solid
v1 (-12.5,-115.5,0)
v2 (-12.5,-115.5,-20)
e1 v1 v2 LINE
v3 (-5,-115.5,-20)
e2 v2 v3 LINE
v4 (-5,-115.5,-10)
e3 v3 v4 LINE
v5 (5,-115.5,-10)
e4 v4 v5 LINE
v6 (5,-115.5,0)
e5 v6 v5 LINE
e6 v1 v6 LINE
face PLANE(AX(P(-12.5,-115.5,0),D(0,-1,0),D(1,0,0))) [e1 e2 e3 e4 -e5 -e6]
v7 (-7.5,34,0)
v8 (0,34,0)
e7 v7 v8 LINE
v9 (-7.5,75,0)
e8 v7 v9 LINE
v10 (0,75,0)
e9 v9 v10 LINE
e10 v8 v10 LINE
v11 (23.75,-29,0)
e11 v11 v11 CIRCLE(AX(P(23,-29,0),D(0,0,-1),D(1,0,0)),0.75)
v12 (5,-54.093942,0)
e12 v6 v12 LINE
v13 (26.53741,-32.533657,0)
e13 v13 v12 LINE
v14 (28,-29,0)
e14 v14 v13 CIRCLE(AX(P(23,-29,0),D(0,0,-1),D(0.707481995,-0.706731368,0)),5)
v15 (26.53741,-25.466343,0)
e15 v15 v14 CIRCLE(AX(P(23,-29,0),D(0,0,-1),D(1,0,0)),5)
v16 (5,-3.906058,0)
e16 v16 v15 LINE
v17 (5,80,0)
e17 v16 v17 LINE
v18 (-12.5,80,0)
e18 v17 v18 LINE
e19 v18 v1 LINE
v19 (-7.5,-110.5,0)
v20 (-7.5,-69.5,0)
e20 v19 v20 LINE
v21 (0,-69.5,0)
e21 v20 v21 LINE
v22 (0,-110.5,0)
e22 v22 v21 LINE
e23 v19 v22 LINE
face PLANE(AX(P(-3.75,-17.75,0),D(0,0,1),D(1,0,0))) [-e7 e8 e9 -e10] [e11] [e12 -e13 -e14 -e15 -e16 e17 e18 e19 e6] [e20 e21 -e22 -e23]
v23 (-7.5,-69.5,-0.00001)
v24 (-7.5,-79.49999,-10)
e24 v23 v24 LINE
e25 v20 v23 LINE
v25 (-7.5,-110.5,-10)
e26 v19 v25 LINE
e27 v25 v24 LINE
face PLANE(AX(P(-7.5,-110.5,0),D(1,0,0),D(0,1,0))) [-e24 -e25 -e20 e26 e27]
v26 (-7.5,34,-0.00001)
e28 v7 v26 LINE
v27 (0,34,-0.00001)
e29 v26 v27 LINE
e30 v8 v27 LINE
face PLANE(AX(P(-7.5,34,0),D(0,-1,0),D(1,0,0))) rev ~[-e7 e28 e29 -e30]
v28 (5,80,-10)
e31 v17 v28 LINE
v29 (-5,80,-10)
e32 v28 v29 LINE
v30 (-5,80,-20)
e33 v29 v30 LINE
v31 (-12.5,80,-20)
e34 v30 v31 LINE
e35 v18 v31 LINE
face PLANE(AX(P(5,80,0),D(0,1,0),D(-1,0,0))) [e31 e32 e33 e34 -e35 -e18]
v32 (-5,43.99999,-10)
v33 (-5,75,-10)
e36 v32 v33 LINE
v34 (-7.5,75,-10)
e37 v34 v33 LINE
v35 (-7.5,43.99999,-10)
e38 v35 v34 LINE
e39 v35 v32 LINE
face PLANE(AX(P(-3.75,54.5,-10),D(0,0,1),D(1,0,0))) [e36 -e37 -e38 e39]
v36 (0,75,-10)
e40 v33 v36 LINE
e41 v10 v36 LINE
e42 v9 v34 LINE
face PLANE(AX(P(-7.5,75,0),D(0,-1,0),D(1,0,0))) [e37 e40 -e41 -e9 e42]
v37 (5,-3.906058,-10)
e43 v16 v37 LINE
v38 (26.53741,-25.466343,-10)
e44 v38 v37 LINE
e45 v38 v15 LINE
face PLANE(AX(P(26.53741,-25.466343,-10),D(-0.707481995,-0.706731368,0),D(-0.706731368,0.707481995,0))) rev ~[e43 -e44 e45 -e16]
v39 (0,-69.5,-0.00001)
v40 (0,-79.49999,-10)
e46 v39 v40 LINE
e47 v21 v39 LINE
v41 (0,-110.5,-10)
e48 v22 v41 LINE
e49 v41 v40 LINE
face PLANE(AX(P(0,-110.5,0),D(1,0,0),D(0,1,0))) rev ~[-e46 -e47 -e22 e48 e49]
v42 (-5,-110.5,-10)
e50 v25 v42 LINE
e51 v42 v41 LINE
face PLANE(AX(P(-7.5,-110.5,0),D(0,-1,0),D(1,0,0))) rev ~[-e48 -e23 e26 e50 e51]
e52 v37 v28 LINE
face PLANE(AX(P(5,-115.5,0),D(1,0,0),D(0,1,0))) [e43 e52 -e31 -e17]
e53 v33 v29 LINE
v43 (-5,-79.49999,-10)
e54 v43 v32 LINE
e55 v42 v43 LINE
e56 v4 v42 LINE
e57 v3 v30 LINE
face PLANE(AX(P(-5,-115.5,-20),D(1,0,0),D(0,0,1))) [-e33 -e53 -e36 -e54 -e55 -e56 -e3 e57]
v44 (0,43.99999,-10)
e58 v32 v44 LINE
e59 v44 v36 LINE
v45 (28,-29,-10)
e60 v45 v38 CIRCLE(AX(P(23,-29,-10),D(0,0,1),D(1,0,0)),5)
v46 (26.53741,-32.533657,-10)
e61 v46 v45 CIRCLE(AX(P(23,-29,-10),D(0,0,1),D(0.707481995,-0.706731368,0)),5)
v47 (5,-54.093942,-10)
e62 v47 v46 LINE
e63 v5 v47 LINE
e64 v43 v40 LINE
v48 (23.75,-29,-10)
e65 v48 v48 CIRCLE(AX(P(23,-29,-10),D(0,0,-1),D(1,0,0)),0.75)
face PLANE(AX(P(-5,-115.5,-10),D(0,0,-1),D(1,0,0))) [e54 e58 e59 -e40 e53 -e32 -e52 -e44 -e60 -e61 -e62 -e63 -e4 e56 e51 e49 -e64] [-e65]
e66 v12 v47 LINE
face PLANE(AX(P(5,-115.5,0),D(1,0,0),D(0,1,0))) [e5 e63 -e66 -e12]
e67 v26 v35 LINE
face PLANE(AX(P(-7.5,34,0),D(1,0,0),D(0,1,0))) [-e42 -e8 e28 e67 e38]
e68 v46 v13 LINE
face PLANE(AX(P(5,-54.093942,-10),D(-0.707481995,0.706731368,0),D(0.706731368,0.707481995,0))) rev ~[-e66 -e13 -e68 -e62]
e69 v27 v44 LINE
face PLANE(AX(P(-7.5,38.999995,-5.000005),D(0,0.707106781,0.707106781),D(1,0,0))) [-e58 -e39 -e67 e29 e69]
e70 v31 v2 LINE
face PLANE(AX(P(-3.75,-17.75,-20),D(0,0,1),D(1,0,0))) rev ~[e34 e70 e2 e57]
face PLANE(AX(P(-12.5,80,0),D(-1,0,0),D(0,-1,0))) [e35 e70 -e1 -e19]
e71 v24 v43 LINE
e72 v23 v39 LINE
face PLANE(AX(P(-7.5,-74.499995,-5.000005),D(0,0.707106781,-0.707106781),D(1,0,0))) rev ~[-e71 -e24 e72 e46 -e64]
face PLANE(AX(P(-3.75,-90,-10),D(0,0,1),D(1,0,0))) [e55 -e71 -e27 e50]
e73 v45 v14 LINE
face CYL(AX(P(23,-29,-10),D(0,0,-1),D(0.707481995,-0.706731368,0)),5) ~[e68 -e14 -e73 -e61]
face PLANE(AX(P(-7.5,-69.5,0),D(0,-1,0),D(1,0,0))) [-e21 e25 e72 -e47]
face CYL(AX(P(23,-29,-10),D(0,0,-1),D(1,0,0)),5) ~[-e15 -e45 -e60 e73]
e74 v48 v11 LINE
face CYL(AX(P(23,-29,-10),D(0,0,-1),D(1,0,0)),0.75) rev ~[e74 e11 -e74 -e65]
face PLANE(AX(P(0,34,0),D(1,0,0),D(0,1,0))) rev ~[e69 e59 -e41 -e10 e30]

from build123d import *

# Parameters (mm, degrees)
F0_W     = 7.5
F0_H     = 41
F1_DEPTH = 20
F2_DEPTH = 10
F3_SIZE  = 9.99999
F4_W     = 10
F4_H     = 10
F5_DEPTH = 195.501
F7_DEPTH = 10
F8_R     = 0.75
F9_DEPTH = 25


# Not quite as in the source:
# - a fillet or chamfer is up to 0.001 mm smaller than in the source, because OpenCascade refuses the exact size


with BuildPart() as f1:
    # F0 (on Top) → F1 (new body)
    with BuildSketch(Plane.XY):
        Polygon((-12.5, 80), (-12.5, 75), (-12.5, -115.5), (5, -115.5), (5, -110.5), (5, 80), align=None)
        Polygon((0, 34), (0, 0), (0, -7.5), (0, -69.5), (0, -110.5), (-7.5, -110.5), (-7.5, -69.5), (-7.5, 34), (-7.5, 75), (0, 75), align=None, mode=Mode.SUBTRACT)
        with Locations((-3.75, -90)):
            Rectangle(F0_W, F0_H)
        Polygon((0, -7.5), (0, 0), (0, 34), (-7.5, 34), (-7.5, -69.5), (0, -69.5), align=None)
        with Locations((-3.75, 54.5)):
            Rectangle(F0_W, F0_H)
    extrude(amount=-F1_DEPTH)

    # F0 (on Top) → F2 (cut)
    with BuildSketch(Plane.XY):
        with Locations((-3.75, 54.5)):
            Rectangle(F0_W, F0_H)
        with Locations((-3.75, -90)):
            Rectangle(F0_W, F0_H)
    extrude(amount=-F2_DEPTH, mode=Mode.SUBTRACT)

    # F3 (size 10 in the source; OpenCascade refuses exactly that, so slightly less here)
    f3_edges = [f1.edges().sort_by_distance(p)[0] for p in [
        (-3.75, -69.5, -10),
        (-3.75, 34, -10),
    ]]
    chamfer(f3_edges, length=F3_SIZE)

    # F4 (on face) → F5 (cut, through all)
    with BuildSketch(Plane.XZ.offset(115.5)):
        with Locations((0, -15)):
            Rectangle(F4_W, F4_H)
    extrude(amount=-F5_DEPTH, mode=Mode.SUBTRACT)

    # F6 (on face) → F7 (join)
    with BuildSketch(Plane.XY):
        with BuildLine():
            Line((29, -22.6551367564), (5, -3.9060580615))
            Line((5, -3.9060580615), (5, -54.0939419385))
            Line((5, -54.0939419385), (32.0781262822, -32.9401952478))
            ThreePointArc((32.0781262822, -32.9401952478), (26.8080409916, -33.4939198597), (24, -29))
            ThreePointArc((24, -29), (25.4644660941, -25.4644660941), (29, -24))
            Line((29, -24), (29, -22.6551367564))
        make_face()
        with BuildLine():
            Line((32.0781262822, -25.0598047522), (29, -22.6551367564))
            Line((29, -22.6551367564), (29, -24))
            ThreePointArc((29, -24), (30.627732128, -24.2723697142), (32.0781262822, -25.0598047522))
        make_face()
        with BuildLine():
            ThreePointArc((32.0781262822, -25.0598047522), (30.627732128, -24.2723697142), (29, -24))
            Line((29, -24), (29, -28.5))
            ThreePointArc((29, -28.5), (29.3535533906, -28.6464466094), (29.5, -29))
            ThreePointArc((29.5, -29), (29, -29.5), (28.5, -29))
            Line((28.5, -29), (24, -29))
            ThreePointArc((24, -29), (26.8080409916, -33.4939198597), (32.0781262822, -32.9401952478))
            ThreePointArc((32.0781262822, -32.9401952478), (33.4939198597, -31.1919590084), (34, -29))
            ThreePointArc((34, -29), (33.4939198597, -26.8080409916), (32.0781262822, -25.0598047522))
        make_face()
        with BuildLine():
            Line((29, -28.5), (29, -24))
            ThreePointArc((29, -24), (25.4644660941, -25.4644660941), (24, -29))
            Line((24, -29), (28.5, -29))
            ThreePointArc((28.5, -29), (28.6464466094, -28.6464466094), (29, -28.5))
        make_face()
    extrude(amount=-F7_DEPTH)

    # F8 (on face) → F9 (cut)
    with BuildSketch(Plane(origin=(0, 0, -10), x_dir=(1, 0, 0), z_dir=(0, 0, -1))):
        with Locations((23, 29)):
            Circle(F8_R)
        with BuildLine():
            ThreePointArc((26.537409976, 32.5336568398), (27.6199052956, 30.9121911672), (28, 29))
            ThreePointArc((28, 29), (27.6199052956, 27.0878088328), (26.537409976, 25.4663431602))
            Line((26.537409976, 25.4663431602), (5, 3.9060580615))
            Line((5, 3.9060580615), (32.0781262822, 25.0598047522))
            ThreePointArc((32.0781262822, 25.0598047522), (34, 29), (32.0781262822, 32.9401952478))
            Line((32.0781262822, 32.9401952478), (5, 54.0939419385))
            Line((5, 54.0939419385), (26.537409976, 32.5336568398))
        make_face()
        with BuildLine():
            ThreePointArc((29.5, 29), (29, 28.5), (28.5, 29))
            ThreePointArc((28.5, 29), (29, 29.5), (29.5, 29))
        make_face(mode=Mode.SUBTRACT)
    extrude(amount=-F9_DEPTH, mode=Mode.SUBTRACT)


solid = f1.part
